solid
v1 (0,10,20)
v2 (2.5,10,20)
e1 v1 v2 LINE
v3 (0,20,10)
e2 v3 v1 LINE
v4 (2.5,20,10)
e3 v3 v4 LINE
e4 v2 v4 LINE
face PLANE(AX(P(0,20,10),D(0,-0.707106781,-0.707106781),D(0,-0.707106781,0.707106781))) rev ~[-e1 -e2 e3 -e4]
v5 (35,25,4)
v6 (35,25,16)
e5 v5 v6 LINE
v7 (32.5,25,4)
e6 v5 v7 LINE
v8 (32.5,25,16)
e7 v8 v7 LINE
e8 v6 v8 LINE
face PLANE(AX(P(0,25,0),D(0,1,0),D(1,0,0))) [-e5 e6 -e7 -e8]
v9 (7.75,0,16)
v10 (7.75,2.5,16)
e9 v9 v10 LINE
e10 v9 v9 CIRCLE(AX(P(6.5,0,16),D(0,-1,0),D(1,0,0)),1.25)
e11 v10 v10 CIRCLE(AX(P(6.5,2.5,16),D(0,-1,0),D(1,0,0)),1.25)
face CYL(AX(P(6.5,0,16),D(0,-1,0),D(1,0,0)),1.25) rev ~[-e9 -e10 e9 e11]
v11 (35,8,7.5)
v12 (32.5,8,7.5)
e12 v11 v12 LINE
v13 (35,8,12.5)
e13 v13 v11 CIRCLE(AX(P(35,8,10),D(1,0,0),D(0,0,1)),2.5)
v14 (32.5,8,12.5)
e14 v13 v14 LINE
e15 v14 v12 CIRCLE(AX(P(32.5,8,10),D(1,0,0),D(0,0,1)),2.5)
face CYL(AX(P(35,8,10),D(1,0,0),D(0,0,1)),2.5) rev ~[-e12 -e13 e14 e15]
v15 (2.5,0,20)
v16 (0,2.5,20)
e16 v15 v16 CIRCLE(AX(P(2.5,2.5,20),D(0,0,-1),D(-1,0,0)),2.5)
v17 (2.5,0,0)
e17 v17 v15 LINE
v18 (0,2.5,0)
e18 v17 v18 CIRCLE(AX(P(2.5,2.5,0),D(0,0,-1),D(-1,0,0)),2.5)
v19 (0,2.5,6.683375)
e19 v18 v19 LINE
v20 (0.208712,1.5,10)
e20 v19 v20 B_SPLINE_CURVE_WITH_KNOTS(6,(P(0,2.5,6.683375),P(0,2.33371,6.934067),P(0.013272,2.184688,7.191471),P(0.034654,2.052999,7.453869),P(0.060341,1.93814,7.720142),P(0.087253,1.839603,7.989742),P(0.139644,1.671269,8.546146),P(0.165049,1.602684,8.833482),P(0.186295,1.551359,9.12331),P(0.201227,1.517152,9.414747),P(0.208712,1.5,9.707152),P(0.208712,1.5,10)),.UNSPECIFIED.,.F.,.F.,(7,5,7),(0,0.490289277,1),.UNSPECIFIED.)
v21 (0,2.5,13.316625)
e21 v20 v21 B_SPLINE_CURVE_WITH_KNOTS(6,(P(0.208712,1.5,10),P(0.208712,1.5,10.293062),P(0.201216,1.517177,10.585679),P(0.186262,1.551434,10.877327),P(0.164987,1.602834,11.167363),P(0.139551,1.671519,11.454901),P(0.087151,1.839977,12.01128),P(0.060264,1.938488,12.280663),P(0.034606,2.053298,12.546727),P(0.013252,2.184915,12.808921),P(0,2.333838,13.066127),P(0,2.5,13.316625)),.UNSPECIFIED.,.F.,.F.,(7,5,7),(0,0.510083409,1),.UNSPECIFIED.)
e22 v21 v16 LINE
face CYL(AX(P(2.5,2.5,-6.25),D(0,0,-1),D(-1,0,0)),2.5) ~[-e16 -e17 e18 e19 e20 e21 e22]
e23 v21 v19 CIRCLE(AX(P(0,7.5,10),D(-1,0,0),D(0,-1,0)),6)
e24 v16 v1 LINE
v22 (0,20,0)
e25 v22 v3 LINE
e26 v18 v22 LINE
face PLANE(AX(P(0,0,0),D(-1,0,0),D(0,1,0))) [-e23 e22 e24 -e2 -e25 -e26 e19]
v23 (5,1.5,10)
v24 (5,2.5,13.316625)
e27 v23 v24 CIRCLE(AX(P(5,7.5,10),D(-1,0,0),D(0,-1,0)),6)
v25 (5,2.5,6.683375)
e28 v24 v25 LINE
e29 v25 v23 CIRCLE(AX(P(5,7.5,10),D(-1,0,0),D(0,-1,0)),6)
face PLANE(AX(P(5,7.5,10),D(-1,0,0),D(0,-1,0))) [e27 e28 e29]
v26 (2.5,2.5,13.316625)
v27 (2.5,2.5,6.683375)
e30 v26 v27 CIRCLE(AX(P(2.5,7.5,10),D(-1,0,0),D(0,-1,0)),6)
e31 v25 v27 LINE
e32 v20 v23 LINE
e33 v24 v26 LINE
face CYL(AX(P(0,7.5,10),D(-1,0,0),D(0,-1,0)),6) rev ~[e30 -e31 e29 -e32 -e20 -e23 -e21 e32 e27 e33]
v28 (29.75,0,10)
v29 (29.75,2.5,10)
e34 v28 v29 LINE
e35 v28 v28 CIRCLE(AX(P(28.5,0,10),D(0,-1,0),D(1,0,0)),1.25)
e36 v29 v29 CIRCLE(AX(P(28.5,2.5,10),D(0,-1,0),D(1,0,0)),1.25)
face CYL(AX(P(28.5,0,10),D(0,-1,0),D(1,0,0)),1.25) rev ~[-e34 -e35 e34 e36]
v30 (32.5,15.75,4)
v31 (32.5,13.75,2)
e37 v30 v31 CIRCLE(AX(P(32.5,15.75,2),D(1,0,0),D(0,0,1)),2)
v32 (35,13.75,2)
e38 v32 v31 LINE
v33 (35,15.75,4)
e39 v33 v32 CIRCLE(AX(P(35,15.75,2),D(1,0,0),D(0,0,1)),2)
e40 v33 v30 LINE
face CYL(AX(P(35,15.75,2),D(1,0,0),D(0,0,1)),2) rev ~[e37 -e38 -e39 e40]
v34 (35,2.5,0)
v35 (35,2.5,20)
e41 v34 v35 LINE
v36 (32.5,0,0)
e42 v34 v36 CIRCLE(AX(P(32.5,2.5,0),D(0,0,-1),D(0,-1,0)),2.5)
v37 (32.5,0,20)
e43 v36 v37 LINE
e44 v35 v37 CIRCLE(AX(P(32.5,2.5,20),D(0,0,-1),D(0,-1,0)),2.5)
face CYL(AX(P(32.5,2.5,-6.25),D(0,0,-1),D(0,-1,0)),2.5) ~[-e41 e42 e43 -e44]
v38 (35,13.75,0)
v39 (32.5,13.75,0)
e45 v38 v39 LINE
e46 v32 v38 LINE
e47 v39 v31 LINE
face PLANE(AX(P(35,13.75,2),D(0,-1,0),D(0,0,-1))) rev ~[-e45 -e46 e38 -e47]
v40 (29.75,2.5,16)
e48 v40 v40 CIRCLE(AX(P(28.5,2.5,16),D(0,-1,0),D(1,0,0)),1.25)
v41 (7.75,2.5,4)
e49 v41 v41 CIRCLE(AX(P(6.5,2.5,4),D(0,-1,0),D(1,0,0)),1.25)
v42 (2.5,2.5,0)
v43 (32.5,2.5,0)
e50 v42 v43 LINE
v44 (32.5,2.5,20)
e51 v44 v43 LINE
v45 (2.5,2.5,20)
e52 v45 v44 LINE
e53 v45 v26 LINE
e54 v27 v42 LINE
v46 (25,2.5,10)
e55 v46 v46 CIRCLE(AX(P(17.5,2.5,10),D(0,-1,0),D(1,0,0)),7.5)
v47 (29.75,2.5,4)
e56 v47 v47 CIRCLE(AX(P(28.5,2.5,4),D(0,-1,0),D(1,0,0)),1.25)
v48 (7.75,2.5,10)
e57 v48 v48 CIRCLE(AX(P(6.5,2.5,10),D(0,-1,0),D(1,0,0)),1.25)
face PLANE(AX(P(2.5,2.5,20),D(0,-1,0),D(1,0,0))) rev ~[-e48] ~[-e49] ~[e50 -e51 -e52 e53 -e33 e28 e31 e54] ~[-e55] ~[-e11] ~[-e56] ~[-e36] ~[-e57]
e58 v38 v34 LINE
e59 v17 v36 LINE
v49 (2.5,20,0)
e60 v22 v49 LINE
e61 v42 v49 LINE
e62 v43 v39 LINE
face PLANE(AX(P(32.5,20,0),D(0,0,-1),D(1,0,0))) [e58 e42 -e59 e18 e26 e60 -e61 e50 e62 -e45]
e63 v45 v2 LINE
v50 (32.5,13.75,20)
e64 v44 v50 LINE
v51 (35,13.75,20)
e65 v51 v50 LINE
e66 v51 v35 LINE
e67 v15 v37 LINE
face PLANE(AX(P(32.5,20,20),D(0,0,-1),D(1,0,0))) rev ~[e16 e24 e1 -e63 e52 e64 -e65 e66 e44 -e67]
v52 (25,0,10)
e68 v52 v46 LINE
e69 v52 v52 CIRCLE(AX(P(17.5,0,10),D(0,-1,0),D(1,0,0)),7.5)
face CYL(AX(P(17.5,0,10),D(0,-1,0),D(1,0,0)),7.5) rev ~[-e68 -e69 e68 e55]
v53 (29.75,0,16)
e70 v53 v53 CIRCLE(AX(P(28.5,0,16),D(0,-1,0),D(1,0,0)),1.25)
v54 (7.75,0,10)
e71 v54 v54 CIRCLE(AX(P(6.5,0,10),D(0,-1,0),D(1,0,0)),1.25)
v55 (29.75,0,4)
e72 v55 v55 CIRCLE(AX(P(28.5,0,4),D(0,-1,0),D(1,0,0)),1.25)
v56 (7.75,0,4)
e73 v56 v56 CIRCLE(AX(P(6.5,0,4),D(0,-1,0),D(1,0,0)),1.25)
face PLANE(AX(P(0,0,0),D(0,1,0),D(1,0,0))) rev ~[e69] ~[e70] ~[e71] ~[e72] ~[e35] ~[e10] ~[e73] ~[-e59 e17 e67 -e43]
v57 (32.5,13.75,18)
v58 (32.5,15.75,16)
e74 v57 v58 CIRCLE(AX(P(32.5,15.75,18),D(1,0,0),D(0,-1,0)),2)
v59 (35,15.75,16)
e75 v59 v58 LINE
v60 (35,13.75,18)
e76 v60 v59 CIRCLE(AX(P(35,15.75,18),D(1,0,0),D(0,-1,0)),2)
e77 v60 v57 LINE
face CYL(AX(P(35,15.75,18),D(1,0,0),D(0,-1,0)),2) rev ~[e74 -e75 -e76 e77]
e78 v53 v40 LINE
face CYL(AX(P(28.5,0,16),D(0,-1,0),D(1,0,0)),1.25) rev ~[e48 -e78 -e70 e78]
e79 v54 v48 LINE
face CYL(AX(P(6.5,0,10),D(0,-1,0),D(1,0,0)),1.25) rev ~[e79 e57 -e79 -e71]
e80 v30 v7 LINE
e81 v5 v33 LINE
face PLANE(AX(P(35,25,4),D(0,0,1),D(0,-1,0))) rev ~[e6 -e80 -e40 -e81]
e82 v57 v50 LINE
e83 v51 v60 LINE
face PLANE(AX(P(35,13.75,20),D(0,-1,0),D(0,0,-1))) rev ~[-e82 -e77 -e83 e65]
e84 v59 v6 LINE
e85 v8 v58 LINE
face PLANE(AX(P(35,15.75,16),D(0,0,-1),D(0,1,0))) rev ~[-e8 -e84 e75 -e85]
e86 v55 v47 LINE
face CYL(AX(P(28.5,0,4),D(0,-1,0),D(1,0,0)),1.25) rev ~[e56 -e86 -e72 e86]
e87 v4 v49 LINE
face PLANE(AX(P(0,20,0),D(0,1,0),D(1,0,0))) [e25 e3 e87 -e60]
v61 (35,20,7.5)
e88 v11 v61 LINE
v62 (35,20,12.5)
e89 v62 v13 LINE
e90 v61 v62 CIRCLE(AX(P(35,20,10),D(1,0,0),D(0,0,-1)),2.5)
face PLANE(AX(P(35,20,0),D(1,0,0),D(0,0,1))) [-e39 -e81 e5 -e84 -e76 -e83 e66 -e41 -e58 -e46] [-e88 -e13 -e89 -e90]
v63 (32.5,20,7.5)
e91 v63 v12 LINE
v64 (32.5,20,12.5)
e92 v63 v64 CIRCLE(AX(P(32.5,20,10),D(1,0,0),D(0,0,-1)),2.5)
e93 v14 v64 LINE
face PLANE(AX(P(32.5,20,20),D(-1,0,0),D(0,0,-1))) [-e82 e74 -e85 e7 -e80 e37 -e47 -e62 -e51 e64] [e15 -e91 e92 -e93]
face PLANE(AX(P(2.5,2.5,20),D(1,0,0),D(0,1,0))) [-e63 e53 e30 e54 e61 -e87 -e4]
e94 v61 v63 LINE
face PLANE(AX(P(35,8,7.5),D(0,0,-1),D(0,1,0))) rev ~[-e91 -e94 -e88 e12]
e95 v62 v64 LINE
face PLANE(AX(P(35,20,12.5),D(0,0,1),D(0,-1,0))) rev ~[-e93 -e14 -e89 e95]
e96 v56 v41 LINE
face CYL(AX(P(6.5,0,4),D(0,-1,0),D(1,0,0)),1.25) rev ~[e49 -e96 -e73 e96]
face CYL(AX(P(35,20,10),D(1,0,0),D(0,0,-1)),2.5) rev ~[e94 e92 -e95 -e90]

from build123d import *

# Parameters (mm, degrees)
F0_W        = 35
F0_H        = 20
F1_DEPTH    = 20
F2_W        = 30
F2_H        = 17.5
F3_DEPTH    = 25
F4_R        = 6
F5_DEPTH    = 5
F6_T1_DEPTH = 32.5
F7_R        = 7.5
F7_R_2      = 1.25
F8_DEPTH    = 25
F9_R        = 1.25
F10_DEPTH   = 25
F11_DEPTH   = 5
F13_DEPTH   = 5


# Not quite as in the source:
# - a fillet or chamfer that OpenCascade refuses, or shapes differently, is made with other operations: its cross-section is extruded or revolved along the edge and cut away or added


with BuildPart() as f1:
    # F0 (on Top) → F1 (new body)
    with BuildSketch(Plane.XY):
        with Locations((17.5, 10)):
            Rectangle(F0_W, F0_H)
    extrude(amount=F1_DEPTH)

    # F2 (on face) → F3 (cut)
    with BuildSketch(Plane.XY.offset(20)):
        with Locations((17.5, 11.25)):
            Rectangle(F2_W, F2_H)
    extrude(amount=-F3_DEPTH, mode=Mode.SUBTRACT)

    # F4 (on face) → F5 (cut)
    with BuildSketch(Plane(origin=(0, 0, 0), x_dir=(0, -1, 0), z_dir=(-1, 0, 0))):
        with Locations((-7.5, 10)):
            Circle(F4_R)
        Polygon((-20, 20), (-20, 10), (-10, 20), align=None)
    extrude(amount=-F5_DEPTH, mode=Mode.SUBTRACT)

    # F6: fillet of radius 2.5 on 2 edges, made by hand

    # F6_s2 → F6_t1 (cut)
    with BuildSketch(Plane.XY.offset(-6.25)):
        with BuildLine():
            ThreePointArc((0, 2.5), (0.732233047, 0.732233047), (2.5, 0))
            Line((2.5, 0), (0, 0))
            Line((0, 0), (0, 2.5))
        make_face()
        with BuildLine():
            ThreePointArc((32.5, 0), (34.267766953, 0.732233047), (35, 2.5))
            Line((35, 2.5), (35, 0))
            Line((35, 0), (32.5, 0))
        make_face()
    extrude(amount=F6_T1_DEPTH, mode=Mode.SUBTRACT)

    # F7 (on face) → F8 (cut)
    with BuildSketch(Plane.XZ):
        with Locations((17.5, 10)):
            Circle(F7_R)
        with Locations((28.5, 16)):
            Circle(F7_R_2)
        with Locations((28.5, 10)):
            Circle(F7_R_2)
        with Locations((28.5, 4)):
            Circle(F7_R_2)
    extrude(amount=-F8_DEPTH, mode=Mode.SUBTRACT)

    # F9 (on face) → F10 (cut)
    with BuildSketch(Plane.XZ):
        with Locations((6.5, 4)):
            Circle(F9_R)
        with Locations((6.5, 10)):
            Circle(F9_R)
        with Locations((6.5, 16)):
            Circle(F9_R)
    extrude(amount=-F10_DEPTH, mode=Mode.SUBTRACT)

    # F11 (add): a face of the model
    f11_faces = [f1.faces().sort_by_distance(p)[0] for p in [
        (33.75, 20, 10),
    ]]
    extrude(f11_faces, amount=F11_DEPTH)

    # F12 (on face) → F13 (cut)
    with BuildSketch(Plane.YZ.offset(35)):
        with BuildLine():
            Line((8, 7.5), (20, 7.5))
            ThreePointArc((20, 7.5), (22.5, 10), (20, 12.5))
            Line((20, 12.5), (8, 12.5))
            ThreePointArc((8, 12.5), (5.5, 10), (8, 7.5))
        make_face()
        with BuildLine():
            Line((15.75, 16), (25, 16))
            Line((25, 16), (25, 20))
            Line((25, 20), (13.75, 20))
            Line((13.75, 20), (13.75, 18))
            ThreePointArc((13.75, 18), (14.3357864376, 16.5857864376), (15.75, 16))
        make_face()
        with BuildLine():
            Line((25, 0), (25, 4))
            Line((25, 4), (15.75, 4))
            ThreePointArc((15.75, 4), (14.3357864376, 3.4142135624), (13.75, 2))
            Line((13.75, 2), (13.75, 0))
            Line((13.75, 0), (25, 0))
        make_face()
    extrude(amount=-F13_DEPTH, mode=Mode.SUBTRACT)


solid = f1.part
